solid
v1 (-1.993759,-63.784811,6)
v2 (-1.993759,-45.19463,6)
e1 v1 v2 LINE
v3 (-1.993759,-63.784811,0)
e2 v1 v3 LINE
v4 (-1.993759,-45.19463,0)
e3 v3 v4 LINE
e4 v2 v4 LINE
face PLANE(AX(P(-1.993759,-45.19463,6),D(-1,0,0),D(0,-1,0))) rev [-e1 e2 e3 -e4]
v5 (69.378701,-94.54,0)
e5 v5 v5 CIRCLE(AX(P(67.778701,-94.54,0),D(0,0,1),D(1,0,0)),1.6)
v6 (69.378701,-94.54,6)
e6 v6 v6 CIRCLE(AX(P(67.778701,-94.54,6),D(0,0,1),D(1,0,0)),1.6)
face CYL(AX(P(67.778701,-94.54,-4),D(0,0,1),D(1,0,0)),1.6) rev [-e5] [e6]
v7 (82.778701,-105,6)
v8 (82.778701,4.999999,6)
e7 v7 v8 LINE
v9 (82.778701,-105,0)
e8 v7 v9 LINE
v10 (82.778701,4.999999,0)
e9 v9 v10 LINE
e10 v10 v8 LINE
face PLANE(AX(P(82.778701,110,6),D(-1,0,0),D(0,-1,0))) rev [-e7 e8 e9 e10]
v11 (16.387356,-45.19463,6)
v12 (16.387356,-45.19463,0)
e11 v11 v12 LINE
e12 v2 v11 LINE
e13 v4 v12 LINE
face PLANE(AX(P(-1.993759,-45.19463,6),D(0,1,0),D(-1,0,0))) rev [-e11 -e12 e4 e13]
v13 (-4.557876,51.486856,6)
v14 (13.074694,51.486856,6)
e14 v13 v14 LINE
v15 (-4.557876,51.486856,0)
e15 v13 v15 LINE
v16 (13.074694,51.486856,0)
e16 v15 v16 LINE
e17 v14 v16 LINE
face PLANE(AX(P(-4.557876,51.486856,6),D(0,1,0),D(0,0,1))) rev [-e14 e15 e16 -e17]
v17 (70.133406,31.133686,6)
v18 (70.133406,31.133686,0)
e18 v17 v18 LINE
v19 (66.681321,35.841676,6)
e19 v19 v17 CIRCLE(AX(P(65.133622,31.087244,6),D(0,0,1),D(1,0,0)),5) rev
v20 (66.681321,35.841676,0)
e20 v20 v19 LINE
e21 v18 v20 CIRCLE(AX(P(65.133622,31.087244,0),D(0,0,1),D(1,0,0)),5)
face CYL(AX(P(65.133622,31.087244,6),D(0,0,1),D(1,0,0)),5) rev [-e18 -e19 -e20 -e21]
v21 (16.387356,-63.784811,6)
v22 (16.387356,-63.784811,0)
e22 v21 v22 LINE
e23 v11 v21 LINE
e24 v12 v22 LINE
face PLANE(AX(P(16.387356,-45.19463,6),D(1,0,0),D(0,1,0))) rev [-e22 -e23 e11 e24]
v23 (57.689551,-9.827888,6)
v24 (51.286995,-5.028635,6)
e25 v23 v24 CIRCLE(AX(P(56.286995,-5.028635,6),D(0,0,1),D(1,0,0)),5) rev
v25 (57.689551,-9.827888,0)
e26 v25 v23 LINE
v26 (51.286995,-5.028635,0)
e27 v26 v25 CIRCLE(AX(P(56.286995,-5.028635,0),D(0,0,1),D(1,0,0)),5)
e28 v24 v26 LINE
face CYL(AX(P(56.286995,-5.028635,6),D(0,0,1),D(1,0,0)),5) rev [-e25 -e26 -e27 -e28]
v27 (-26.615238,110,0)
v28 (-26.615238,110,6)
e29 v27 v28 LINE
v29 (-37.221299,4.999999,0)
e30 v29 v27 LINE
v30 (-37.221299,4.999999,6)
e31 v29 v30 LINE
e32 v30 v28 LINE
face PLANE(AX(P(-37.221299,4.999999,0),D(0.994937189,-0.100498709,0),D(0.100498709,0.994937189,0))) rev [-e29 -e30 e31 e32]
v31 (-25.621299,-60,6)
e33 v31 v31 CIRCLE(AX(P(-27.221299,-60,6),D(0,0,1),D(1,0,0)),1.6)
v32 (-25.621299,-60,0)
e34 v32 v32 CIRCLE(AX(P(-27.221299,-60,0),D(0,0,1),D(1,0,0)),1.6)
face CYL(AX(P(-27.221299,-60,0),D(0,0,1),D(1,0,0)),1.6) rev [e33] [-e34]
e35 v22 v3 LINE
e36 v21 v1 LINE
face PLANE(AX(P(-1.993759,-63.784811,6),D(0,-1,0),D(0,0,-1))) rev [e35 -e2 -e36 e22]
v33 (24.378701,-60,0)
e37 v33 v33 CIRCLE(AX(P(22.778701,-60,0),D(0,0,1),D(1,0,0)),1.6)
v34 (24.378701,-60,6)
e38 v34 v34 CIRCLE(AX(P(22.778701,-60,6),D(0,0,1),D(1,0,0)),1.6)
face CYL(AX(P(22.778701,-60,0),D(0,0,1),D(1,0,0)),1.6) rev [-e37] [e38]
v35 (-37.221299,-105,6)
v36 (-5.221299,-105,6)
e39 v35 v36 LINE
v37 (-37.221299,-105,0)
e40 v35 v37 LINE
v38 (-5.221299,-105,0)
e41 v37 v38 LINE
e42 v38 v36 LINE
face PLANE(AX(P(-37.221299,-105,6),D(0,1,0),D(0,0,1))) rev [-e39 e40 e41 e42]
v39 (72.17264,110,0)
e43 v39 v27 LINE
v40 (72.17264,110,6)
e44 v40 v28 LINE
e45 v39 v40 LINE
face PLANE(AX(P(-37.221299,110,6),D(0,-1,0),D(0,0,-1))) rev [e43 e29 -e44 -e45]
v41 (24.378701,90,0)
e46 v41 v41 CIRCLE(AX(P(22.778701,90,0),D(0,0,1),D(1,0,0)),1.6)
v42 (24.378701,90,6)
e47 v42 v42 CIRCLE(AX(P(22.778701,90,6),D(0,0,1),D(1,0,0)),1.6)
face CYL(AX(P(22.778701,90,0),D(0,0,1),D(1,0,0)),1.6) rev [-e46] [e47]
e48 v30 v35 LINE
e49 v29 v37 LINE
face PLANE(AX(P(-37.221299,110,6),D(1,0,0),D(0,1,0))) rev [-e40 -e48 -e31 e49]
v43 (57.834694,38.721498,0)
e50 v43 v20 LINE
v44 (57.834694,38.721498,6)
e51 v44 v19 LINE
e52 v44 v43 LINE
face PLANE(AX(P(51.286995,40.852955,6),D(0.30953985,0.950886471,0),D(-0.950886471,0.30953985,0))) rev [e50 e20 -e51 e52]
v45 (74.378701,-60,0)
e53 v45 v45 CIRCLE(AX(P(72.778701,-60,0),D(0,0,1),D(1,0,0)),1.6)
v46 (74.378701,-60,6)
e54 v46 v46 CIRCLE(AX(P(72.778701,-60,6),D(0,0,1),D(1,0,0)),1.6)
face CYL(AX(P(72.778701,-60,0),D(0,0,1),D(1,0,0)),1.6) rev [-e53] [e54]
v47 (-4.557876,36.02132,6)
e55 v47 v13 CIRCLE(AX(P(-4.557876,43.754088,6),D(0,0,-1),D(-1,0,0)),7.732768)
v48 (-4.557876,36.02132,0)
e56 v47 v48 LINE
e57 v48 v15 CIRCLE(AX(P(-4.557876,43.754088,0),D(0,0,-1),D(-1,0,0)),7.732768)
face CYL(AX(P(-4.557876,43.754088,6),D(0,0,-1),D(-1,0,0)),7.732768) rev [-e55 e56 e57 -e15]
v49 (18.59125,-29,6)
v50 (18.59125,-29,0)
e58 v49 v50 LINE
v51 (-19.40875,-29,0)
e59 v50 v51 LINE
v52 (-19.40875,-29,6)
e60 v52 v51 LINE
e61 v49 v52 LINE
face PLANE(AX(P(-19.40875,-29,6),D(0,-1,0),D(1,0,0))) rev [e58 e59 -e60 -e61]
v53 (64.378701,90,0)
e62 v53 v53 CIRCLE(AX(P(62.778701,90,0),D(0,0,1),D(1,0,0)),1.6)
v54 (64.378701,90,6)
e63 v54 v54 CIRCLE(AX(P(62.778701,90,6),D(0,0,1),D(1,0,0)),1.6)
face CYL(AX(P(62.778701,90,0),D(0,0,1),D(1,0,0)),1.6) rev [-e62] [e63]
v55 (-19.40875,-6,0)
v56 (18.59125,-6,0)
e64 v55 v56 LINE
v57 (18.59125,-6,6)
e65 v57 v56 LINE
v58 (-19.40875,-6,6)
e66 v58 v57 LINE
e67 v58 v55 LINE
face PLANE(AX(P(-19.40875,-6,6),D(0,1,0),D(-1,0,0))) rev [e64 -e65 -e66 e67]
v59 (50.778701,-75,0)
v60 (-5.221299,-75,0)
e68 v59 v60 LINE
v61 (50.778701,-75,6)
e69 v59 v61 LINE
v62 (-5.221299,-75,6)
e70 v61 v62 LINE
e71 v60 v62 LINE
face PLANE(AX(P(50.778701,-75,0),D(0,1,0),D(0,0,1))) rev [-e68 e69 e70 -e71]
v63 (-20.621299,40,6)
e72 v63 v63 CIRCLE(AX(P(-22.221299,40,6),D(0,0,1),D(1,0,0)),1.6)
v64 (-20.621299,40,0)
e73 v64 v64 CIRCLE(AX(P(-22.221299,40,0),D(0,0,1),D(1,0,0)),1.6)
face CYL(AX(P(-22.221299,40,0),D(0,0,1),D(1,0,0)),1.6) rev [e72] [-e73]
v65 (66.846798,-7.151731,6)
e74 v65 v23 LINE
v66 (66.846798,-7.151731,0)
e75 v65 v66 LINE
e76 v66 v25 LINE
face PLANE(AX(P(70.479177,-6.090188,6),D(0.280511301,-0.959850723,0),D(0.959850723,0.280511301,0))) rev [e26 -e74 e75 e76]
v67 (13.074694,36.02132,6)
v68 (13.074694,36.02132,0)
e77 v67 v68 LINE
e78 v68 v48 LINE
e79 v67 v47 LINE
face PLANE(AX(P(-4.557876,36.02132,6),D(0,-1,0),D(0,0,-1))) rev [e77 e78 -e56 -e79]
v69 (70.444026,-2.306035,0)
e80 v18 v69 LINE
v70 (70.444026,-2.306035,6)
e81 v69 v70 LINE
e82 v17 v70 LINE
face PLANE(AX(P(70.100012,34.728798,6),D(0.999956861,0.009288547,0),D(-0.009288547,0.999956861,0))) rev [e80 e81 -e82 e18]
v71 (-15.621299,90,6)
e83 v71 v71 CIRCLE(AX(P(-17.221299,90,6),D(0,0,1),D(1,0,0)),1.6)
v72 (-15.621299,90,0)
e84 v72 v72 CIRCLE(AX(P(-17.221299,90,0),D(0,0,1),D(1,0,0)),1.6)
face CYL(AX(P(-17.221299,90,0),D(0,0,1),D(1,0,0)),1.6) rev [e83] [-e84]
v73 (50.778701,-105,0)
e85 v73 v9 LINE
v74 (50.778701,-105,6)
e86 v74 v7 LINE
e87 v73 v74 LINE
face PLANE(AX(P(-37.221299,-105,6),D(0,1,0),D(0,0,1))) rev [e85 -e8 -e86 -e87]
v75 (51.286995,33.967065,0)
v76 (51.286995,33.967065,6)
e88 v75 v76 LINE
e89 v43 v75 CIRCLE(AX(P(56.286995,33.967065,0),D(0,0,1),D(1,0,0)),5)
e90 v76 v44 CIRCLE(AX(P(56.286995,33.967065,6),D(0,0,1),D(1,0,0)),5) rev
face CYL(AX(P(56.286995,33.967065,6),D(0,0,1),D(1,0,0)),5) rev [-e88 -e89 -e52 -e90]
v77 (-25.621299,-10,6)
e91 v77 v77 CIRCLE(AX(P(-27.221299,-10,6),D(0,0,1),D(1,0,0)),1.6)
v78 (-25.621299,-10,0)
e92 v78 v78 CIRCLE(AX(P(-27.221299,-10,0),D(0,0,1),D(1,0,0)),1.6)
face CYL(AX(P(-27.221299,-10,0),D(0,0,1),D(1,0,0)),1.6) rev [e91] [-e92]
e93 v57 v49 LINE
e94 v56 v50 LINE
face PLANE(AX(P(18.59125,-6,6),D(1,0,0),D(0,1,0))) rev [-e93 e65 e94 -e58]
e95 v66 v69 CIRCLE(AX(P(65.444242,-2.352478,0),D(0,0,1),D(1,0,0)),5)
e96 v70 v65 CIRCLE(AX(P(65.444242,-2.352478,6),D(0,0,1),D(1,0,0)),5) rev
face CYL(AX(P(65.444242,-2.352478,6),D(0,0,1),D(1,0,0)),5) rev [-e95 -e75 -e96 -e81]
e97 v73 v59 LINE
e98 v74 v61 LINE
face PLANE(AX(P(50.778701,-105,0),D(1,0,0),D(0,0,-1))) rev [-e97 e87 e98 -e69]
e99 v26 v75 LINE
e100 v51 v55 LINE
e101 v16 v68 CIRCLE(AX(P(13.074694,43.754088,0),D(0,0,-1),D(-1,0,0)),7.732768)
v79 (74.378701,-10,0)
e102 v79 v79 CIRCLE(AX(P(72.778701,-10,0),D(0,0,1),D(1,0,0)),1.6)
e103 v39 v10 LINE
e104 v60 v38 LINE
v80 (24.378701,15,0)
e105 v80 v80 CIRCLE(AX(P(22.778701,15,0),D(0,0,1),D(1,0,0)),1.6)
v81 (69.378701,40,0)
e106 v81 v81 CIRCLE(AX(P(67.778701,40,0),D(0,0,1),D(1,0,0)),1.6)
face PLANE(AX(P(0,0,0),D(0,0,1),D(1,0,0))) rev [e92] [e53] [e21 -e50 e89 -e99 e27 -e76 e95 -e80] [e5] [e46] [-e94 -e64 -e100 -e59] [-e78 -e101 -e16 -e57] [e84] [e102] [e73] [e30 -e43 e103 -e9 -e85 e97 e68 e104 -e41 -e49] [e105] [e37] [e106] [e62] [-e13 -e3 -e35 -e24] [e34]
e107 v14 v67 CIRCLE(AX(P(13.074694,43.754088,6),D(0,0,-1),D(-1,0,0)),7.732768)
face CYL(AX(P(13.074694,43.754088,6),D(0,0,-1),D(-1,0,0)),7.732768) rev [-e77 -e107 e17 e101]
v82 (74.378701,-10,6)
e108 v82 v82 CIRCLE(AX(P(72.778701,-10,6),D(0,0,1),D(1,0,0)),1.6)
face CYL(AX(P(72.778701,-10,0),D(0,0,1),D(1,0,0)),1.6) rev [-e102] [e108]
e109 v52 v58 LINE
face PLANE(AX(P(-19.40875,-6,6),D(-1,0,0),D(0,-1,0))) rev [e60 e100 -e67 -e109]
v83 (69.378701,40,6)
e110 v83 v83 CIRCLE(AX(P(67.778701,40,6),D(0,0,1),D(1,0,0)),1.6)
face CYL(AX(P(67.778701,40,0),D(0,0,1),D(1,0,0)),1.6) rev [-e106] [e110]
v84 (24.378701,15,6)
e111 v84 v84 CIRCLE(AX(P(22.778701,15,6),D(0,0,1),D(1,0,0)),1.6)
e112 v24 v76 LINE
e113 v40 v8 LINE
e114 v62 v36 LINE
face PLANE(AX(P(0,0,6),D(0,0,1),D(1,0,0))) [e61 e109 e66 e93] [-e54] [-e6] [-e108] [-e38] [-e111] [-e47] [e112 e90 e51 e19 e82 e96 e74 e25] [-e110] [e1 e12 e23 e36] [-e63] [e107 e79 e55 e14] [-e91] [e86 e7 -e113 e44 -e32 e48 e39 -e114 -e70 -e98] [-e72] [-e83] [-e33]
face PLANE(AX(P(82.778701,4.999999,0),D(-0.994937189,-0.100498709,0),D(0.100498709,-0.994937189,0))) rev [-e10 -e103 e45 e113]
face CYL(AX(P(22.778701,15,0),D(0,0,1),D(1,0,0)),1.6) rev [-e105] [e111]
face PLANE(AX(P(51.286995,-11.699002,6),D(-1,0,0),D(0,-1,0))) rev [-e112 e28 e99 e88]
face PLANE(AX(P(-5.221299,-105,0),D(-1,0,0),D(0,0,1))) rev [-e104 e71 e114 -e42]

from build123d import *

# Parameters (mm, degrees)
ESQUISSE1_W                    = 120
ESQUISSE1_H                    = 215
BOSS_EXTRU_1_DEPTH             = 6
ESQUISSE2_R                    = 1.6
ENL_V_MAT_EXTRU_1_DEPTH        = 138.798088748
R_P_TITION_LIN_AIRE1_OUTLINE_R = 1.6
R_P_TITION_LIN_AIRE1_DEPTH     = 6
ESQUISSE3_W                    = 38
ESQUISSE3_H                    = 23
ESQUISSE3_W_2                  = 18.381114661
ESQUISSE3_H_2                  = 18.590181779
ENL_V_MAT_EXTRU_2_DEPTH        = 138.798088748
ENL_V_MAT_EXTRU_3_DEPTH        = 138.798088748
CONG_1_R                       = 5
ESQUISSE5_R                    = 1.6
ENL_V_MAT_EXTRU_4_DEPTH        = 10
ESQUISSE6_W                    = 56
ESQUISSE6_H                    = 30
ENL_V_MAT_EXTRU_5_DEPTH        = 138.798088748


# Read off the part's stored shape, not the designer's step: Répétition linéaire1
with BuildPart() as part:
    # Esquisse1 → Boss.-Extru.1 (new body)
    with BuildSketch(Plane.XY):
        with Locations((22.778700537, 2.5)):
            Rectangle(ESQUISSE1_W, ESQUISSE1_H)
    extrude(amount=BOSS_EXTRU_1_DEPTH)

    # Esquisse2 → Enlèv. mat.-Extru.1 (cut, through all)
    with BuildSketch(Plane.XY.offset(6)):
        with Locations((-27.221299463, -60)):
            Circle(ESQUISSE2_R)
    extrude(amount=-ENL_V_MAT_EXTRU_1_DEPTH, mode=Mode.SUBTRACT)

    # Répétition linéaire1 outline → Répétition linéaire1 (cut)
    with BuildSketch(Plane.XY):
        with Locations((-27.221299463, -10)):
            Circle(R_P_TITION_LIN_AIRE1_OUTLINE_R)
        with Locations((-22.221299463, 40)):
            Circle(R_P_TITION_LIN_AIRE1_OUTLINE_R)
        with Locations((-17.221299463, 90)):
            Circle(R_P_TITION_LIN_AIRE1_OUTLINE_R)
        with Locations((22.778700537, -60)):
            Circle(R_P_TITION_LIN_AIRE1_OUTLINE_R)
        with Locations((22.778700537, 15)):
            Circle(R_P_TITION_LIN_AIRE1_OUTLINE_R)
        with Locations((62.778700537, 90)):
            Circle(R_P_TITION_LIN_AIRE1_OUTLINE_R)
        with Locations((67.778700537, 40)):
            Circle(R_P_TITION_LIN_AIRE1_OUTLINE_R)
        with Locations((72.778700537, -10)):
            Circle(R_P_TITION_LIN_AIRE1_OUTLINE_R)
        with Locations((72.778700537, -60)):
            Circle(R_P_TITION_LIN_AIRE1_OUTLINE_R)
        with Locations((22.778700537, 90)):
            Circle(R_P_TITION_LIN_AIRE1_OUTLINE_R)
    extrude(amount=R_P_TITION_LIN_AIRE1_DEPTH, mode=Mode.SUBTRACT)

    # Esquisse3 → Enlèv. mat.-Extru.2 (cut, through all)
    with BuildSketch(Plane(origin=(0, 0, 0), x_dir=(-1, 0, 0), z_dir=(0, 0, -1))):
        with Locations((0.408750369, -17.5)):
            Rectangle(ESQUISSE3_W, ESQUISSE3_H)
        with Locations((-7.196798698, -54.48972052)):
            Rectangle(ESQUISSE3_W_2, ESQUISSE3_H_2)
        with BuildLine():
            Line((4.557875847, 36.021320392), (-13.074694363, 36.021320392))
            ThreePointArc((-13.074694363, 36.021320392), (-20.807462052, 43.75408808), (-13.074694363, 51.486855768))
            Line((-13.074694363, 51.486855768), (4.557875847, 51.486855768))
            ThreePointArc((4.557875847, 51.486855768), (12.290643535, 43.75408808), (4.557875847, 36.021320392))
        make_face()
        Polygon((-51.286994849, -11.69900166), (-51.286994849, 40.852954993), (-70.100011596, 34.728797636), (-70.479177032, -6.090187837), align=None)
        with BuildLine():
            Line((-30.778700537, -101), (-30.778700537, -105))
            Line((-30.778700537, -105), (-14.778700537, -105))
            Line((-14.778700537, -105), (-14.778700537, -101))
            ThreePointArc((-14.778700537, -101), (-22.778700537, -93), (-30.778700537, -101))
        make_face()
    extrude(amount=-ENL_V_MAT_EXTRU_2_DEPTH, mode=Mode.SUBTRACT)

    # Esquisse4 → Enlèv. mat.-Extru.3 (cut, through all)
    with BuildSketch(Plane.XY.offset(6)):
        Polygon((-37.221299463, 110), (-37.221299463, 4.99999922), (-26.615238451, 110), align=None)
        Polygon((72.172639526, 110), (82.778700537, 110), (82.778700537, 4.99999922), align=None)
    extrude(amount=-ENL_V_MAT_EXTRU_3_DEPTH, mode=Mode.SUBTRACT)

    # Congé1
    cong_1_edges = [part.edges().sort_by_distance(p)[0] for p in [
        (70.100011596, 34.728797636, 3),
        (51.286994849, 40.852954993, 3),
        (51.286994849, -11.69900166, 3),
        (70.479177032, -6.090187837, 3),
    ]]
    fillet(cong_1_edges, radius=CONG_1_R)

    # Esquisse5 → Enlèv. mat.-Extru.4 (cut)
    with BuildSketch(Plane.XY.offset(6)):
        with Locations((67.778700537, -94.54)):
            Circle(ESQUISSE5_R)
    extrude(amount=-ENL_V_MAT_EXTRU_4_DEPTH, mode=Mode.SUBTRACT)

    # Esquisse6 → Enlèv. mat.-Extru.5 (cut, through all)
    with BuildSketch(Plane.XY.offset(6)):
        with Locations((22.778700537, -90)):
            Rectangle(ESQUISSE6_W, ESQUISSE6_H)
    extrude(amount=-ENL_V_MAT_EXTRU_5_DEPTH, mode=Mode.SUBTRACT)


solid = part.part
